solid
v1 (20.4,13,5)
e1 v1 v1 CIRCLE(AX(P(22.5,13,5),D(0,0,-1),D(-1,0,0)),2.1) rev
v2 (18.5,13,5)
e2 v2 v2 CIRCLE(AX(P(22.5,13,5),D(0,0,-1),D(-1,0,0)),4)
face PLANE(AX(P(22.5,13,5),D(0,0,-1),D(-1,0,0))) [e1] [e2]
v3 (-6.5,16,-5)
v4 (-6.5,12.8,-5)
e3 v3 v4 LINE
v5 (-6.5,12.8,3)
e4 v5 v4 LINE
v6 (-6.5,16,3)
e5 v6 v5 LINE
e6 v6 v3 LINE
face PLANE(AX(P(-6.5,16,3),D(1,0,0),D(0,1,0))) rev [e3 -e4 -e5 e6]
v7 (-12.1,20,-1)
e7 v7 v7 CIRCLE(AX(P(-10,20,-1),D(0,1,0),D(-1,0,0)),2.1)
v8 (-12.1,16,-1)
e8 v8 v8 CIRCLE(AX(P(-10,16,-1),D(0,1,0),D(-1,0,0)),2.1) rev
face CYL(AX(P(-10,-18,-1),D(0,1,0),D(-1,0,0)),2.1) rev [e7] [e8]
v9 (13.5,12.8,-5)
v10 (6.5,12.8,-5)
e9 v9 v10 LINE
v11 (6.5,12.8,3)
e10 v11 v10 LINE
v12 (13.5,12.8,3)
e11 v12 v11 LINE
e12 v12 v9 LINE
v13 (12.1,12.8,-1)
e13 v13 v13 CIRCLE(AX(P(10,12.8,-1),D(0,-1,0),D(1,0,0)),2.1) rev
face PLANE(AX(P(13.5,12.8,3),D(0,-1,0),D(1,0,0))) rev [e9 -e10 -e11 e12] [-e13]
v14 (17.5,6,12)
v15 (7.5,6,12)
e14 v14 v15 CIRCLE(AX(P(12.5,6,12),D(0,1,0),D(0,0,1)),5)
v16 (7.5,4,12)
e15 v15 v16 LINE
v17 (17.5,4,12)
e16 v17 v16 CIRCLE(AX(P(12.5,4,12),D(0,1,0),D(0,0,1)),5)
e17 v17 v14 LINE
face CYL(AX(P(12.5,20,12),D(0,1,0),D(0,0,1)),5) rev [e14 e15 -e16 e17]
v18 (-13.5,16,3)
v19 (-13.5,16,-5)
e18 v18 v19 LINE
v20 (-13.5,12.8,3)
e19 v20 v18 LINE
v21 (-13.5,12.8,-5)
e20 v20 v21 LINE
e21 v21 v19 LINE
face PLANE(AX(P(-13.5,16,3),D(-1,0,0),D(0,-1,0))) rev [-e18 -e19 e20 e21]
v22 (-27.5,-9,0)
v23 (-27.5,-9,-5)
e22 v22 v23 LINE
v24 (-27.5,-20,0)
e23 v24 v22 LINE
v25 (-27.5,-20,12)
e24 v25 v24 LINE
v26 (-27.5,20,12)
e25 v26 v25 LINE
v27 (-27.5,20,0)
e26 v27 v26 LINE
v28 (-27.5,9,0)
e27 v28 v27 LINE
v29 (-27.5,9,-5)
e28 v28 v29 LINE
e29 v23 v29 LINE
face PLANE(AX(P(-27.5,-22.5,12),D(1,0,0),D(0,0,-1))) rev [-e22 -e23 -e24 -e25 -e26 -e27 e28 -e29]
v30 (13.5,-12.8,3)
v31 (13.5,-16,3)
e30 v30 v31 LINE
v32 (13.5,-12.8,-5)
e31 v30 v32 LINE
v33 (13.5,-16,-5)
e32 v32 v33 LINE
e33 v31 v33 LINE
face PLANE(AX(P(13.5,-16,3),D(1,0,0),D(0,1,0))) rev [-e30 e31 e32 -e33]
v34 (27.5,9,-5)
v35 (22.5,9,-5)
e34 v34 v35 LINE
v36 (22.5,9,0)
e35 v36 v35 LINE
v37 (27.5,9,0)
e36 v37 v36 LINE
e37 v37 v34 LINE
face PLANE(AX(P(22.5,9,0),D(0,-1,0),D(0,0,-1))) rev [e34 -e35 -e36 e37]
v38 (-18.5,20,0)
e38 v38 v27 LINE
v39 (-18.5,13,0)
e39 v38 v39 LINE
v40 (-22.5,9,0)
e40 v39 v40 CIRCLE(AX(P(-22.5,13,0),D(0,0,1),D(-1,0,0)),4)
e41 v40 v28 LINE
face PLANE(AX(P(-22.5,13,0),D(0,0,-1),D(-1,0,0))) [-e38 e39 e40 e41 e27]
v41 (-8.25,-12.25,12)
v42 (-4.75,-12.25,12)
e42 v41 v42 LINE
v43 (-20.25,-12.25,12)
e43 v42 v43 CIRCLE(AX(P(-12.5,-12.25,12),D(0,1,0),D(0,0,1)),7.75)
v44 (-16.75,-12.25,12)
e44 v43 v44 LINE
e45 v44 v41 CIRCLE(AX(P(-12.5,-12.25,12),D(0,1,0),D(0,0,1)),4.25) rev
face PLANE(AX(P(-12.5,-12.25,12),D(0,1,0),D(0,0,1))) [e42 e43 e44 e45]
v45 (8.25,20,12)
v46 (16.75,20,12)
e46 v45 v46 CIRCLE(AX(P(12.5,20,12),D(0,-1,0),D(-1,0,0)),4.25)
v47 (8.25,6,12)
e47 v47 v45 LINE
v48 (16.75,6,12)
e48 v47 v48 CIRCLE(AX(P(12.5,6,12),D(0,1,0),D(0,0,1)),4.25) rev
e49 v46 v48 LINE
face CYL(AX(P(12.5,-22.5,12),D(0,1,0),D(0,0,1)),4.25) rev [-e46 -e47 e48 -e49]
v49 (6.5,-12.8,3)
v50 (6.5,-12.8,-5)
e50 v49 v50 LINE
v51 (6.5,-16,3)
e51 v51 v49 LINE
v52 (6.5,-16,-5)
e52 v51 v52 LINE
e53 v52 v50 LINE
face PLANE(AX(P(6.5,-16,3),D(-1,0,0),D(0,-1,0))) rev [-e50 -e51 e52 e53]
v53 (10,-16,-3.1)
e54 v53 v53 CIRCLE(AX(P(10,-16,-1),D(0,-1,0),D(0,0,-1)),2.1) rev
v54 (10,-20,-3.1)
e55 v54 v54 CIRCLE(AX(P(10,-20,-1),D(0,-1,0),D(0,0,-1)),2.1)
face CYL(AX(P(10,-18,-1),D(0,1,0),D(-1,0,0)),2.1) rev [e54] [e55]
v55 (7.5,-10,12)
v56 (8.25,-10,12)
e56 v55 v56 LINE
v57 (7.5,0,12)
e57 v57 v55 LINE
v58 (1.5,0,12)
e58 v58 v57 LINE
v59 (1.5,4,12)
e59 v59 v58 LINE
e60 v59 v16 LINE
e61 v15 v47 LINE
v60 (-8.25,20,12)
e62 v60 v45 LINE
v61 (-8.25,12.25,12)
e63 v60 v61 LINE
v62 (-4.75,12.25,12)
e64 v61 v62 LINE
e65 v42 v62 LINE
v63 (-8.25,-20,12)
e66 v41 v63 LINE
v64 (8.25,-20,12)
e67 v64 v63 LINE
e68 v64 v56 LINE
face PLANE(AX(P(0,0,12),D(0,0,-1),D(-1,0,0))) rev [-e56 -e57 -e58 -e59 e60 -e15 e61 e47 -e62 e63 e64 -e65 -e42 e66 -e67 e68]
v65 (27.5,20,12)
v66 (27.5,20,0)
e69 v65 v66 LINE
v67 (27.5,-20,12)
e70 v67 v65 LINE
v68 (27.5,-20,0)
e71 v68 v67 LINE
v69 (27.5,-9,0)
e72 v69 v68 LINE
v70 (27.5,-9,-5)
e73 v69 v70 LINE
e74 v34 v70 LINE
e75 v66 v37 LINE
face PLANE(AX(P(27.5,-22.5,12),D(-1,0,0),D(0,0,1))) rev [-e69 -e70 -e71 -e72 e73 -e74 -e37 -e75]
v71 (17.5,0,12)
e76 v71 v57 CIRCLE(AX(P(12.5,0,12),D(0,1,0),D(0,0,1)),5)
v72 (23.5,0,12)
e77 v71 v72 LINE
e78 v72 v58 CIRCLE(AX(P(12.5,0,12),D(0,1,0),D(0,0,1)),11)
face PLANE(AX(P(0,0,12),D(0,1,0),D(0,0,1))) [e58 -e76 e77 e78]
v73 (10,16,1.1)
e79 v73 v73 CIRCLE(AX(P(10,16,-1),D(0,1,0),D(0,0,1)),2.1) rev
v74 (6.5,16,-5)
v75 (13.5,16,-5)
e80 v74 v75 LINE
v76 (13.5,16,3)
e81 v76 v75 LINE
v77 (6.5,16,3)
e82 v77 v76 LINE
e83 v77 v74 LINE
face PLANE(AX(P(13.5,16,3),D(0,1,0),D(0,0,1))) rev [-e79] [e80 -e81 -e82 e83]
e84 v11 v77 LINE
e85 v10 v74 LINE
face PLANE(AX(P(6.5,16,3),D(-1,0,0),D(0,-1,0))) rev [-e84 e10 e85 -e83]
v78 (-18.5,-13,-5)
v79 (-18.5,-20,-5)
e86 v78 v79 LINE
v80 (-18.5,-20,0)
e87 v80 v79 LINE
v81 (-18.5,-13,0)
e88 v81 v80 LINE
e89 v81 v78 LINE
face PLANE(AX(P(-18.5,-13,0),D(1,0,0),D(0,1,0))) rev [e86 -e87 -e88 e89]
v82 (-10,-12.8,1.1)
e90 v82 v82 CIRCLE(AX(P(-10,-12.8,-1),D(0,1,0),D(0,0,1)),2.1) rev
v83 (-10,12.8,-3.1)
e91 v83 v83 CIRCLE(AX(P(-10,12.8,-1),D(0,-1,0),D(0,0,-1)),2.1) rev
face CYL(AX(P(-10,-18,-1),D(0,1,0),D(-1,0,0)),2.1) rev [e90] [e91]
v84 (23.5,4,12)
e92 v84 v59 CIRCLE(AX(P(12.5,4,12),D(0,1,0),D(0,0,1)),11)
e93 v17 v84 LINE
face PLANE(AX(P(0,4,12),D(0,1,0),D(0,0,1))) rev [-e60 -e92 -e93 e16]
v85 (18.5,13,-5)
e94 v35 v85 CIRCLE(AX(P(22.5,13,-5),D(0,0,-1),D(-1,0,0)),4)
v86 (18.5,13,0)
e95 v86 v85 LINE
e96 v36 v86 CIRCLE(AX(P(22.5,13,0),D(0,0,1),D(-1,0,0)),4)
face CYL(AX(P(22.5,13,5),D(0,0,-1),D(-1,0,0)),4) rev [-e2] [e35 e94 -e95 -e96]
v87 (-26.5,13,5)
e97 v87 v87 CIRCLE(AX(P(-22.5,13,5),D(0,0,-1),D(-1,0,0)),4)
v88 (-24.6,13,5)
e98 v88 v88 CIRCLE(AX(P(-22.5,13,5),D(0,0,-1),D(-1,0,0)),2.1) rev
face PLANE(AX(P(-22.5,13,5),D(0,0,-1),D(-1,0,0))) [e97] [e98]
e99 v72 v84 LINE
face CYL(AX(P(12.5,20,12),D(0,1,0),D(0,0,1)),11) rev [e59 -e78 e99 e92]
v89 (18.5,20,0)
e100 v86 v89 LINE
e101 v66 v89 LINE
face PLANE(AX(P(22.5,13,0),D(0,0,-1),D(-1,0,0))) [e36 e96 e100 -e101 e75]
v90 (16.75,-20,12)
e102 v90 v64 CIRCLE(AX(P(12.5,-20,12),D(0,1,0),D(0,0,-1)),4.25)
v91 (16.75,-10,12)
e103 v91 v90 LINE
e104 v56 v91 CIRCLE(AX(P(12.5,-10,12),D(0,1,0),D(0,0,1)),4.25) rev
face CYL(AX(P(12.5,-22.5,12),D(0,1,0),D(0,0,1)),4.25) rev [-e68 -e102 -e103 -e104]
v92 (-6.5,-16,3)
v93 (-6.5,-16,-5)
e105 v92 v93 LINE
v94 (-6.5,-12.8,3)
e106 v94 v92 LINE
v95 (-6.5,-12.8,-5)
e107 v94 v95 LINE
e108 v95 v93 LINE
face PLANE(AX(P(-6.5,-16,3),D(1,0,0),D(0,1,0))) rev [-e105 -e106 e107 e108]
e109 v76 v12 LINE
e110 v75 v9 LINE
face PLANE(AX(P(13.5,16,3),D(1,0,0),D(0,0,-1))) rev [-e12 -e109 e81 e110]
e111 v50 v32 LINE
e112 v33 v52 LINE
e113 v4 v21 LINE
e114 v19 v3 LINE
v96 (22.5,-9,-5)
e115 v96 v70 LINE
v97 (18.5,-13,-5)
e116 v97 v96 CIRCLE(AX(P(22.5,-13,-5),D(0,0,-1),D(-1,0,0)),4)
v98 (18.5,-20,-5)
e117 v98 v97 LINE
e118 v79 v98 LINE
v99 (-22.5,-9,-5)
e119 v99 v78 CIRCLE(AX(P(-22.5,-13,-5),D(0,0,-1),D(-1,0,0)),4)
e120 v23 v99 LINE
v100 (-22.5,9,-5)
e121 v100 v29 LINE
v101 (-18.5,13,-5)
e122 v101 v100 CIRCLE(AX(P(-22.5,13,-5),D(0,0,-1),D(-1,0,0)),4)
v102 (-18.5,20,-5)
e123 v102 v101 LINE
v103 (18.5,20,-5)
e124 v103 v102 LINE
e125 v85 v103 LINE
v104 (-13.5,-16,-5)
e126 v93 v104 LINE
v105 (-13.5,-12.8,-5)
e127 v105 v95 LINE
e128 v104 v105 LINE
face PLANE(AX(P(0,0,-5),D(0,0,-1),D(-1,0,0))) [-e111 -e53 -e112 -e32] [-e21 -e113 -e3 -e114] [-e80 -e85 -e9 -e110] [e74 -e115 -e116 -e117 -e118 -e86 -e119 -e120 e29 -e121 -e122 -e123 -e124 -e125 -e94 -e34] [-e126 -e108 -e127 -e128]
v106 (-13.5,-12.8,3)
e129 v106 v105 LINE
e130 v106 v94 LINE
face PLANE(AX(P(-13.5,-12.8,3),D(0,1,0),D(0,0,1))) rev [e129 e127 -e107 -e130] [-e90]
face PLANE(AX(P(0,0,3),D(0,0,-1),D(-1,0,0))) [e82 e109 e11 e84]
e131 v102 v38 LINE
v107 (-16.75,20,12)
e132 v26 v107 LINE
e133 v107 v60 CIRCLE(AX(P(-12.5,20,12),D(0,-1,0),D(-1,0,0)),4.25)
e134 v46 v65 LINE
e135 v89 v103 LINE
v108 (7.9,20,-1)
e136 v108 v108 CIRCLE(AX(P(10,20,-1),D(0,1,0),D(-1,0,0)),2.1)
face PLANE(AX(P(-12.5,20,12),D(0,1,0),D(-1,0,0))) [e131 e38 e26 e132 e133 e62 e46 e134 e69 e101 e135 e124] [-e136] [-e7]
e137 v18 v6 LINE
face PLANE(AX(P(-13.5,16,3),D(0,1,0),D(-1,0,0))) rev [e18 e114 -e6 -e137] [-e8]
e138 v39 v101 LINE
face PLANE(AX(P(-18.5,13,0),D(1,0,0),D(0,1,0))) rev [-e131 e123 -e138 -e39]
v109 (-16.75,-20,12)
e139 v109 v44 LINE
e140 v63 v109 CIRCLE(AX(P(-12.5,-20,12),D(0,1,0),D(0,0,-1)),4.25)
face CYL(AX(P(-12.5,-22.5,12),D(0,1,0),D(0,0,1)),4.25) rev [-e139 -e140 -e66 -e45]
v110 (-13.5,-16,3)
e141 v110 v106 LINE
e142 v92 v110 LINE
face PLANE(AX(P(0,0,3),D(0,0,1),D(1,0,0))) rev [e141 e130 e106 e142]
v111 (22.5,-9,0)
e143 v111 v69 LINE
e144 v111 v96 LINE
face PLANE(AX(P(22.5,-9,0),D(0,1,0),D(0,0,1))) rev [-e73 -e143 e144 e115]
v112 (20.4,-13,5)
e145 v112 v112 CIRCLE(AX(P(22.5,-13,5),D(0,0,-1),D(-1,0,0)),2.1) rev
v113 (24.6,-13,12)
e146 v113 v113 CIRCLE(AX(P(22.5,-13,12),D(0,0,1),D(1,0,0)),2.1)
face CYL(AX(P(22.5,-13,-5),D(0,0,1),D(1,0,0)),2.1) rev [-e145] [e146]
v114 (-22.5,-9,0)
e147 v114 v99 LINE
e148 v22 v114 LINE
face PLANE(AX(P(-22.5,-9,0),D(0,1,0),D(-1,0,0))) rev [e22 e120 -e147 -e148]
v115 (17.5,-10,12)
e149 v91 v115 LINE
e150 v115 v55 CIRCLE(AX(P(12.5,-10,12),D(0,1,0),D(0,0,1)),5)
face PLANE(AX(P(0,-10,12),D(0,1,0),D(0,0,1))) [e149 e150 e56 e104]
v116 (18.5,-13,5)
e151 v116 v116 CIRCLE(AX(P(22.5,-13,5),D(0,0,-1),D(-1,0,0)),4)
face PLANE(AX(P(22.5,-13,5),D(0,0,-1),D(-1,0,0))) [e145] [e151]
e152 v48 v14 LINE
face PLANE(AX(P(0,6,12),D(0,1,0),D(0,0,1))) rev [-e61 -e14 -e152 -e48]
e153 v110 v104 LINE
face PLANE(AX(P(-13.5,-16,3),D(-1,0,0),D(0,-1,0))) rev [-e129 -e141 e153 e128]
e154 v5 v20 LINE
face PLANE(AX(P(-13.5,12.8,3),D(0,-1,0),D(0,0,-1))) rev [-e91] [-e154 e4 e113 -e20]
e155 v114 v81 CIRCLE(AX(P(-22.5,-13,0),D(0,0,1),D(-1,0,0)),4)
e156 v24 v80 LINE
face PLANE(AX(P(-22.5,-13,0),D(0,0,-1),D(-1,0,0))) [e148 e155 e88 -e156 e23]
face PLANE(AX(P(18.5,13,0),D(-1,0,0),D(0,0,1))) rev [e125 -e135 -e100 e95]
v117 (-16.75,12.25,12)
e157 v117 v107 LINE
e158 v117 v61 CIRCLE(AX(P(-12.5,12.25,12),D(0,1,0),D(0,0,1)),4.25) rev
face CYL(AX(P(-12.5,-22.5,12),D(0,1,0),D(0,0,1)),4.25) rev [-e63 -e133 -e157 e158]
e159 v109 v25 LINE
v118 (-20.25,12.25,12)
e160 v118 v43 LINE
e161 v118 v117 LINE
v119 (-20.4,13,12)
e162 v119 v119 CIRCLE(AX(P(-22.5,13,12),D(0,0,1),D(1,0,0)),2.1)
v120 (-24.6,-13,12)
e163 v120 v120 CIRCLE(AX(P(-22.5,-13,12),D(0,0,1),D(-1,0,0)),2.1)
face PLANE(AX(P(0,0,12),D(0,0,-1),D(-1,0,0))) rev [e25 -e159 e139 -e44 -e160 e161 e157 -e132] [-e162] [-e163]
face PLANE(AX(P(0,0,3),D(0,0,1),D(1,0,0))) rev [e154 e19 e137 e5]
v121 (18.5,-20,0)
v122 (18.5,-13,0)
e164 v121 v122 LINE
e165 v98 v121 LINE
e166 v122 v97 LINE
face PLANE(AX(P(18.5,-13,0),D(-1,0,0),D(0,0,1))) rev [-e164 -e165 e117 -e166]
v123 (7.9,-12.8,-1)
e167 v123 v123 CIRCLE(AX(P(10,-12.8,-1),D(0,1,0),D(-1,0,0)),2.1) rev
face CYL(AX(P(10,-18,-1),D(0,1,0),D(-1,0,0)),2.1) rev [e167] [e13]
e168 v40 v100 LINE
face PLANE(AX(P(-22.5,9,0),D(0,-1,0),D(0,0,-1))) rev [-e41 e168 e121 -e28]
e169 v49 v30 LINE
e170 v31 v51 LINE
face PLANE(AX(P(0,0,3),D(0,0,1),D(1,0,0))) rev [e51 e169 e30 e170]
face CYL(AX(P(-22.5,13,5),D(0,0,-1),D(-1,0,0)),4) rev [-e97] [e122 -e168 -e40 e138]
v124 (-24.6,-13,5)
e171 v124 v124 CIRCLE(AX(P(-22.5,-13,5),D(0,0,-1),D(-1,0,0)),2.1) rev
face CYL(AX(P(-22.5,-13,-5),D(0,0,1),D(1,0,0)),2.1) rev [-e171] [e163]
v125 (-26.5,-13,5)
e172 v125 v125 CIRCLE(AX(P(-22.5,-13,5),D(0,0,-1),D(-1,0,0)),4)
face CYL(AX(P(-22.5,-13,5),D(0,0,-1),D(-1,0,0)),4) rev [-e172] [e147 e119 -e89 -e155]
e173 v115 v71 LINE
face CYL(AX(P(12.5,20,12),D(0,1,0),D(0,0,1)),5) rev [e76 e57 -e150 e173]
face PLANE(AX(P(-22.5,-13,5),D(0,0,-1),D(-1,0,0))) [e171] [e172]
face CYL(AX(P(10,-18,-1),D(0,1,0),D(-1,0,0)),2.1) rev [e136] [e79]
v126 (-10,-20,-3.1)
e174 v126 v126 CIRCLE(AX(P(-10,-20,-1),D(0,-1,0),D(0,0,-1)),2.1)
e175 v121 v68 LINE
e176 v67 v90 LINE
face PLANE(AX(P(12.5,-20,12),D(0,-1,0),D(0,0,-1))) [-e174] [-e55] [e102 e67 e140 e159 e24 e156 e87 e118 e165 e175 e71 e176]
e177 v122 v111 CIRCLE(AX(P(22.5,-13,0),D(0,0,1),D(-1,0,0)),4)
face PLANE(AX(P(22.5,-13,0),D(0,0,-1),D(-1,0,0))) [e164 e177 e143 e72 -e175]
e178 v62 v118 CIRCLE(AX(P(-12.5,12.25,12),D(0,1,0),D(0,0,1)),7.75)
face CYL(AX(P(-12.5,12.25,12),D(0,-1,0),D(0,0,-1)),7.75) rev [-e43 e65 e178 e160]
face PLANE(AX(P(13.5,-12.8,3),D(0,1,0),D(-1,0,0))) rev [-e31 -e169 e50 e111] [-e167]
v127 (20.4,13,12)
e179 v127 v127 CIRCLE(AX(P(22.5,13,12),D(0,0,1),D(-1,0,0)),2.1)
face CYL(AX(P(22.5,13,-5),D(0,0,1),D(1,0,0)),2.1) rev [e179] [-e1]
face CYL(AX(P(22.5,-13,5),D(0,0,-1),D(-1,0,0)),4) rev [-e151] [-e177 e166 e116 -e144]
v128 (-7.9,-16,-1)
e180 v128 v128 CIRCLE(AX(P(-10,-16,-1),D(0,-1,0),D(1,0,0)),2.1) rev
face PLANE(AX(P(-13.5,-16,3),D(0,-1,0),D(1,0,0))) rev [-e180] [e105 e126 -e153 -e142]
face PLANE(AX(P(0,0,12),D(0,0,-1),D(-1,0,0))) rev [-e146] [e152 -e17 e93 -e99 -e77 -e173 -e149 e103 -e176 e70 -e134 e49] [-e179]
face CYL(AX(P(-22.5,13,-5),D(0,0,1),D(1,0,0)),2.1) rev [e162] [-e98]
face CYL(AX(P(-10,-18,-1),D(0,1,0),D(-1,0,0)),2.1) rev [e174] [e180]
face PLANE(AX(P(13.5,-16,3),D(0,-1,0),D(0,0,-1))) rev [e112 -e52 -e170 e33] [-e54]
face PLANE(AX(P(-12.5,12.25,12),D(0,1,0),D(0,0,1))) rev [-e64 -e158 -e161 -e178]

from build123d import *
from build123d.topology import SkipClean

# Parameters (mm, degrees)
ESQUISSE1_W                  = 55
ESQUISSE1_H                  = 45
BOSS_EXTRU_1_DEPTH           = 12
ESQUISSE2_R                  = 4.25
ENL_V_MAT_EXTRU_1_DEPTH      = 55.085580333
ENL_V_MAT_EXTRU_2_DEPTH      = 12.25
ENL_V_MAT_EXTRU_2_DEPTH_BACK = 12.25
ESQUISSE3_R                  = 7.75
ESQUISSE9_W                  = 61.062756781
ESQUISSE9_H                  = 12.22812859
ESQUISSE9_W_2                = 59.427147224
ESQUISSE9_H_2                = 8.100161614
ENL_V_MAT_EXTRU_7_DEPTH      = 31
SKETCH1_W                    = 55
SKETCH1_H                    = 36
BOSS_EXTRUDE1_DEPTH          = 5
SKETCH2_R                    = 2.1
CUT_EXTRUDE1_DEPTH           = 38.003378224
SKETCH3_R                    = 4
CUT_EXTRUDE2_DEPTH           = 10
CUT_EXTRUDE3_DEPTH           = 5
SKETCH5_R                    = 2.1
CUT_EXTRUDE4_DEPTH           = 47.864165415
BOSS_EXTRUDE4_START          = 2
SKETCH7_R                    = 2.1
BOSS_EXTRUDE4_DEPTH          = 2
SKETCH8_R                    = 2.1
BOSS_EXTRUDE5_DEPTH          = 2
SKETCH9_W                    = 7
SKETCH9_H                    = 3.2
CUT_EXTRUDE6_DEPTH           = 8


with BuildPart() as part:
    # Esquisse1 → Boss.-Extru.1 (new body)
    with BuildSketch(Plane.XY):
        Rectangle(ESQUISSE1_W, ESQUISSE1_H)
    extrude(amount=BOSS_EXTRU_1_DEPTH)

    # Esquisse2 → Enlèv. mat.-Extru.1 (cut, through all)
    with BuildSketch(Plane(origin=(0, 22.5, 0), x_dir=(1, 0, 0), z_dir=(0, 1, 0))):
        with Locations((-12.5, -12)):
            Circle(ESQUISSE2_R)
        with Locations((12.5, -12)):
            Circle(ESQUISSE2_R)
    extrude(amount=-ENL_V_MAT_EXTRU_1_DEPTH, mode=Mode.SUBTRACT)

    # Esquisse3 → Enlèv. mat.-Extru.2 (cut, two sides: drawn at the far end of the back side and taken through both)
    with BuildSketch(Plane(origin=(0, 0, 0), x_dir=(1, 0, 0), z_dir=(0, 1, 0)).offset(-ENL_V_MAT_EXTRU_2_DEPTH_BACK)):
        with Locations((-12.5, -12)):
            Circle(ESQUISSE3_R)
    extrude(amount=ENL_V_MAT_EXTRU_2_DEPTH + ENL_V_MAT_EXTRU_2_DEPTH_BACK, mode=Mode.SUBTRACT)

    # Esquisse9 → Enlèv. mat.-Extru.7 (cut)
    with BuildSketch(Plane.XY.offset(12)):
        with Locations((-0.389430846, -24.114064295)):
            Rectangle(ESQUISSE9_W, ESQUISSE9_H)
        with Locations((1.674552641, 22.050080807)):
            Rectangle(ESQUISSE9_W_2, ESQUISSE9_H_2)
    extrude(amount=-ENL_V_MAT_EXTRU_7_DEPTH, mode=Mode.SUBTRACT)

    # Sketch1 → Boss-Extrude1 (add)
    with BuildSketch(Plane(origin=(0, 0, 0), x_dir=(-1, 0, 0), z_dir=(0, 0, -1))):
        Rectangle(SKETCH1_W, SKETCH1_H)
    extrude(amount=BOSS_EXTRUDE1_DEPTH)

    # Sketch2 → Cut-Extrude1 (cut, through all)
    with BuildSketch(Plane.XY.offset(12)):
        with Locations((-22.5, 13)):
            Circle(SKETCH2_R)
        with Locations((22.5, 13)):
            Circle(SKETCH2_R)
        with Locations((22.5, -13)):
            Circle(SKETCH2_R)
        with Locations((-22.5, -13)):
            Circle(SKETCH2_R)
    extrude(amount=-CUT_EXTRUDE1_DEPTH, mode=Mode.SUBTRACT)

    # Sketch3 → Cut-Extrude2 (cut)
    with BuildSketch(Plane(origin=(0, 0, -5), x_dir=(-1, 0, 0), z_dir=(0, 0, -1))):
        with Locations((-22.5, 13)):
            Circle(SKETCH3_R)
        with Locations((22.5, 13)):
            Circle(SKETCH3_R)
        with Locations((22.5, -13)):
            Circle(SKETCH3_R)
        with Locations((-22.5, -13)):
            Circle(SKETCH3_R)
    extrude(amount=-CUT_EXTRUDE2_DEPTH, mode=Mode.SUBTRACT)

    # Sketch4 → Cut-Extrude3 (cut)
    with BuildSketch(Plane(origin=(0, 0, -5), x_dir=(-1, 0, 0), z_dir=(0, 0, -1))):
        with BuildLine():
            Line((-18.5, 13), (-18.5, 18))
            Line((-18.5, 18), (-27.5, 18))
            Line((-27.5, 18), (-27.5, 9))
            Line((-27.5, 9), (-22.5, 9))
            ThreePointArc((-22.5, 9), (-25.328427125, 15.828427125), (-18.5, 13))
        make_face()
        with BuildLine():
            Line((-22.5, -9), (-27.5, -9))
            Line((-27.5, -9), (-27.5, -18))
            Line((-27.5, -18), (-18.5, -18))
            Line((-18.5, -18), (-18.5, -13))
            ThreePointArc((-18.5, -13), (-25.328427125, -15.828427125), (-22.5, -9))
        make_face()
        with BuildLine():
            Line((27.5, -18), (27.5, -9))
            Line((27.5, -9), (22.5, -9))
            ThreePointArc((22.5, -9), (25.328427125, -15.828427125), (18.5, -13))
            Line((18.5, -13), (18.5, -18))
            Line((18.5, -18), (27.5, -18))
        make_face()
        with BuildLine():
            Line((27.5, 18), (18.5, 18))
            Line((18.5, 18), (18.5, 13))
            ThreePointArc((18.5, 13), (25.328427125, 15.828427125), (22.5, 9))
            Line((22.5, 9), (27.5, 9))
            Line((27.5, 9), (27.5, 18))
        make_face()
    extrude(amount=-CUT_EXTRUDE3_DEPTH, mode=Mode.SUBTRACT)

    # Sketch5 → Cut-Extrude4 (cut, through all)
    with BuildSketch(Plane(origin=(0, 18, 0), x_dir=(1, 0, 0), z_dir=(0, 1, 0))):
        with Locations((-10, 1)):
            Circle(SKETCH5_R)
        with Locations((10, 1)):
            Circle(SKETCH5_R)
    extrude(amount=-CUT_EXTRUDE4_DEPTH, mode=Mode.SUBTRACT)

    # Sketch7 → Boss-Extrude4 (add)
    with SkipClean():  # the faces are left unmerged after this step: merging them gives an invalid solid
        with BuildSketch(Plane(origin=(0, 18, 0), x_dir=(1, 0, 0), z_dir=(0, 1, 0)).offset(BOSS_EXTRUDE4_START)):
            with BuildLine():
                Line((18.5, 5), (-18.5, 5))
                Line((-18.5, 5), (-18.5, 0))
                Line((-18.5, 0), (-27.5, 0))
                Line((-27.5, 0), (-27.5, -12))
                Line((-27.5, -12), (-16.75, -12))
                ThreePointArc((-16.75, -12), (-12.5, -7.75), (-8.25, -12))
                Line((-8.25, -12), (8.25, -12))
                ThreePointArc((8.25, -12), (12.5, -7.75), (16.75, -12))
                Line((16.75, -12), (27.5, -12))
                Line((27.5, -12), (27.5, 0))
                Line((27.5, 0), (18.5, 0))
                Line((18.5, 0), (18.5, 5))
            make_face()
            with Locations((10, 1)):
                Circle(SKETCH7_R, mode=Mode.SUBTRACT)
            with Locations((-10, 1)):
                Circle(SKETCH7_R, mode=Mode.SUBTRACT)
        extrude(amount=-BOSS_EXTRUDE4_DEPTH)
    add(part.part.scale(1), mode=Mode.REPLACE)  # the faces are merged on a copy

    # Sketch8 → Boss-Extrude5 (add)
    with BuildSketch(Plane.XZ.offset(18)):
        with BuildLine():
            Line((-27.5, 0), (-18.5, 0))
            Line((-18.5, 0), (-18.5, -5))
            Line((-18.5, -5), (18.5, -5))
            Line((18.5, -5), (18.5, 0))
            Line((18.5, 0), (27.5, 0))
            Line((27.5, 0), (27.5, 12))
            Line((27.5, 12), (16.75, 12))
            ThreePointArc((16.75, 12), (12.5, 7.75), (8.25, 12))
            Line((8.25, 12), (-8.25, 12))
            ThreePointArc((-8.25, 12), (-12.5, 7.75), (-16.75, 12))
            Line((-16.75, 12), (-27.5, 12))
            Line((-27.5, 12), (-27.5, 0))
        make_face()
        with Locations((10, -1)):
            Circle(SKETCH8_R, mode=Mode.SUBTRACT)
        with Locations((-10, -1)):
            Circle(SKETCH8_R, mode=Mode.SUBTRACT)
    extrude(amount=BOSS_EXTRUDE5_DEPTH)

    # Sketch9 → Cut-Extrude6 (cut)
    with BuildSketch(Plane(origin=(0, 0, -5), x_dir=(-1, 0, 0), z_dir=(0, 0, -1))):
        with Locations((-10, 14.4)):
            Rectangle(SKETCH9_W, SKETCH9_H)
        with Locations((10, 14.4)):
            Rectangle(SKETCH9_W, SKETCH9_H)
        with Locations((10, -14.4)):
            Rectangle(SKETCH9_W, SKETCH9_H)
        with Locations((-10, -14.4)):
            Rectangle(SKETCH9_W, SKETCH9_H)
    extrude(amount=-CUT_EXTRUDE6_DEPTH, mode=Mode.SUBTRACT)

    # Sketch10 → Cut-Revolve1 (revolve, cut)
    with BuildSketch(Plane.XY.offset(12)):
        Polygon((12.5, -10), (17.5, -10), (17.5, 0), (23.5, 0), (23.5, 4), (17.5, 4), (17.5, 6), (12.5, 6), align=None)
    revolve(axis=Axis((12.5, 20, 12), (0, -1, 0)), mode=Mode.SUBTRACT)


solid = part.part
